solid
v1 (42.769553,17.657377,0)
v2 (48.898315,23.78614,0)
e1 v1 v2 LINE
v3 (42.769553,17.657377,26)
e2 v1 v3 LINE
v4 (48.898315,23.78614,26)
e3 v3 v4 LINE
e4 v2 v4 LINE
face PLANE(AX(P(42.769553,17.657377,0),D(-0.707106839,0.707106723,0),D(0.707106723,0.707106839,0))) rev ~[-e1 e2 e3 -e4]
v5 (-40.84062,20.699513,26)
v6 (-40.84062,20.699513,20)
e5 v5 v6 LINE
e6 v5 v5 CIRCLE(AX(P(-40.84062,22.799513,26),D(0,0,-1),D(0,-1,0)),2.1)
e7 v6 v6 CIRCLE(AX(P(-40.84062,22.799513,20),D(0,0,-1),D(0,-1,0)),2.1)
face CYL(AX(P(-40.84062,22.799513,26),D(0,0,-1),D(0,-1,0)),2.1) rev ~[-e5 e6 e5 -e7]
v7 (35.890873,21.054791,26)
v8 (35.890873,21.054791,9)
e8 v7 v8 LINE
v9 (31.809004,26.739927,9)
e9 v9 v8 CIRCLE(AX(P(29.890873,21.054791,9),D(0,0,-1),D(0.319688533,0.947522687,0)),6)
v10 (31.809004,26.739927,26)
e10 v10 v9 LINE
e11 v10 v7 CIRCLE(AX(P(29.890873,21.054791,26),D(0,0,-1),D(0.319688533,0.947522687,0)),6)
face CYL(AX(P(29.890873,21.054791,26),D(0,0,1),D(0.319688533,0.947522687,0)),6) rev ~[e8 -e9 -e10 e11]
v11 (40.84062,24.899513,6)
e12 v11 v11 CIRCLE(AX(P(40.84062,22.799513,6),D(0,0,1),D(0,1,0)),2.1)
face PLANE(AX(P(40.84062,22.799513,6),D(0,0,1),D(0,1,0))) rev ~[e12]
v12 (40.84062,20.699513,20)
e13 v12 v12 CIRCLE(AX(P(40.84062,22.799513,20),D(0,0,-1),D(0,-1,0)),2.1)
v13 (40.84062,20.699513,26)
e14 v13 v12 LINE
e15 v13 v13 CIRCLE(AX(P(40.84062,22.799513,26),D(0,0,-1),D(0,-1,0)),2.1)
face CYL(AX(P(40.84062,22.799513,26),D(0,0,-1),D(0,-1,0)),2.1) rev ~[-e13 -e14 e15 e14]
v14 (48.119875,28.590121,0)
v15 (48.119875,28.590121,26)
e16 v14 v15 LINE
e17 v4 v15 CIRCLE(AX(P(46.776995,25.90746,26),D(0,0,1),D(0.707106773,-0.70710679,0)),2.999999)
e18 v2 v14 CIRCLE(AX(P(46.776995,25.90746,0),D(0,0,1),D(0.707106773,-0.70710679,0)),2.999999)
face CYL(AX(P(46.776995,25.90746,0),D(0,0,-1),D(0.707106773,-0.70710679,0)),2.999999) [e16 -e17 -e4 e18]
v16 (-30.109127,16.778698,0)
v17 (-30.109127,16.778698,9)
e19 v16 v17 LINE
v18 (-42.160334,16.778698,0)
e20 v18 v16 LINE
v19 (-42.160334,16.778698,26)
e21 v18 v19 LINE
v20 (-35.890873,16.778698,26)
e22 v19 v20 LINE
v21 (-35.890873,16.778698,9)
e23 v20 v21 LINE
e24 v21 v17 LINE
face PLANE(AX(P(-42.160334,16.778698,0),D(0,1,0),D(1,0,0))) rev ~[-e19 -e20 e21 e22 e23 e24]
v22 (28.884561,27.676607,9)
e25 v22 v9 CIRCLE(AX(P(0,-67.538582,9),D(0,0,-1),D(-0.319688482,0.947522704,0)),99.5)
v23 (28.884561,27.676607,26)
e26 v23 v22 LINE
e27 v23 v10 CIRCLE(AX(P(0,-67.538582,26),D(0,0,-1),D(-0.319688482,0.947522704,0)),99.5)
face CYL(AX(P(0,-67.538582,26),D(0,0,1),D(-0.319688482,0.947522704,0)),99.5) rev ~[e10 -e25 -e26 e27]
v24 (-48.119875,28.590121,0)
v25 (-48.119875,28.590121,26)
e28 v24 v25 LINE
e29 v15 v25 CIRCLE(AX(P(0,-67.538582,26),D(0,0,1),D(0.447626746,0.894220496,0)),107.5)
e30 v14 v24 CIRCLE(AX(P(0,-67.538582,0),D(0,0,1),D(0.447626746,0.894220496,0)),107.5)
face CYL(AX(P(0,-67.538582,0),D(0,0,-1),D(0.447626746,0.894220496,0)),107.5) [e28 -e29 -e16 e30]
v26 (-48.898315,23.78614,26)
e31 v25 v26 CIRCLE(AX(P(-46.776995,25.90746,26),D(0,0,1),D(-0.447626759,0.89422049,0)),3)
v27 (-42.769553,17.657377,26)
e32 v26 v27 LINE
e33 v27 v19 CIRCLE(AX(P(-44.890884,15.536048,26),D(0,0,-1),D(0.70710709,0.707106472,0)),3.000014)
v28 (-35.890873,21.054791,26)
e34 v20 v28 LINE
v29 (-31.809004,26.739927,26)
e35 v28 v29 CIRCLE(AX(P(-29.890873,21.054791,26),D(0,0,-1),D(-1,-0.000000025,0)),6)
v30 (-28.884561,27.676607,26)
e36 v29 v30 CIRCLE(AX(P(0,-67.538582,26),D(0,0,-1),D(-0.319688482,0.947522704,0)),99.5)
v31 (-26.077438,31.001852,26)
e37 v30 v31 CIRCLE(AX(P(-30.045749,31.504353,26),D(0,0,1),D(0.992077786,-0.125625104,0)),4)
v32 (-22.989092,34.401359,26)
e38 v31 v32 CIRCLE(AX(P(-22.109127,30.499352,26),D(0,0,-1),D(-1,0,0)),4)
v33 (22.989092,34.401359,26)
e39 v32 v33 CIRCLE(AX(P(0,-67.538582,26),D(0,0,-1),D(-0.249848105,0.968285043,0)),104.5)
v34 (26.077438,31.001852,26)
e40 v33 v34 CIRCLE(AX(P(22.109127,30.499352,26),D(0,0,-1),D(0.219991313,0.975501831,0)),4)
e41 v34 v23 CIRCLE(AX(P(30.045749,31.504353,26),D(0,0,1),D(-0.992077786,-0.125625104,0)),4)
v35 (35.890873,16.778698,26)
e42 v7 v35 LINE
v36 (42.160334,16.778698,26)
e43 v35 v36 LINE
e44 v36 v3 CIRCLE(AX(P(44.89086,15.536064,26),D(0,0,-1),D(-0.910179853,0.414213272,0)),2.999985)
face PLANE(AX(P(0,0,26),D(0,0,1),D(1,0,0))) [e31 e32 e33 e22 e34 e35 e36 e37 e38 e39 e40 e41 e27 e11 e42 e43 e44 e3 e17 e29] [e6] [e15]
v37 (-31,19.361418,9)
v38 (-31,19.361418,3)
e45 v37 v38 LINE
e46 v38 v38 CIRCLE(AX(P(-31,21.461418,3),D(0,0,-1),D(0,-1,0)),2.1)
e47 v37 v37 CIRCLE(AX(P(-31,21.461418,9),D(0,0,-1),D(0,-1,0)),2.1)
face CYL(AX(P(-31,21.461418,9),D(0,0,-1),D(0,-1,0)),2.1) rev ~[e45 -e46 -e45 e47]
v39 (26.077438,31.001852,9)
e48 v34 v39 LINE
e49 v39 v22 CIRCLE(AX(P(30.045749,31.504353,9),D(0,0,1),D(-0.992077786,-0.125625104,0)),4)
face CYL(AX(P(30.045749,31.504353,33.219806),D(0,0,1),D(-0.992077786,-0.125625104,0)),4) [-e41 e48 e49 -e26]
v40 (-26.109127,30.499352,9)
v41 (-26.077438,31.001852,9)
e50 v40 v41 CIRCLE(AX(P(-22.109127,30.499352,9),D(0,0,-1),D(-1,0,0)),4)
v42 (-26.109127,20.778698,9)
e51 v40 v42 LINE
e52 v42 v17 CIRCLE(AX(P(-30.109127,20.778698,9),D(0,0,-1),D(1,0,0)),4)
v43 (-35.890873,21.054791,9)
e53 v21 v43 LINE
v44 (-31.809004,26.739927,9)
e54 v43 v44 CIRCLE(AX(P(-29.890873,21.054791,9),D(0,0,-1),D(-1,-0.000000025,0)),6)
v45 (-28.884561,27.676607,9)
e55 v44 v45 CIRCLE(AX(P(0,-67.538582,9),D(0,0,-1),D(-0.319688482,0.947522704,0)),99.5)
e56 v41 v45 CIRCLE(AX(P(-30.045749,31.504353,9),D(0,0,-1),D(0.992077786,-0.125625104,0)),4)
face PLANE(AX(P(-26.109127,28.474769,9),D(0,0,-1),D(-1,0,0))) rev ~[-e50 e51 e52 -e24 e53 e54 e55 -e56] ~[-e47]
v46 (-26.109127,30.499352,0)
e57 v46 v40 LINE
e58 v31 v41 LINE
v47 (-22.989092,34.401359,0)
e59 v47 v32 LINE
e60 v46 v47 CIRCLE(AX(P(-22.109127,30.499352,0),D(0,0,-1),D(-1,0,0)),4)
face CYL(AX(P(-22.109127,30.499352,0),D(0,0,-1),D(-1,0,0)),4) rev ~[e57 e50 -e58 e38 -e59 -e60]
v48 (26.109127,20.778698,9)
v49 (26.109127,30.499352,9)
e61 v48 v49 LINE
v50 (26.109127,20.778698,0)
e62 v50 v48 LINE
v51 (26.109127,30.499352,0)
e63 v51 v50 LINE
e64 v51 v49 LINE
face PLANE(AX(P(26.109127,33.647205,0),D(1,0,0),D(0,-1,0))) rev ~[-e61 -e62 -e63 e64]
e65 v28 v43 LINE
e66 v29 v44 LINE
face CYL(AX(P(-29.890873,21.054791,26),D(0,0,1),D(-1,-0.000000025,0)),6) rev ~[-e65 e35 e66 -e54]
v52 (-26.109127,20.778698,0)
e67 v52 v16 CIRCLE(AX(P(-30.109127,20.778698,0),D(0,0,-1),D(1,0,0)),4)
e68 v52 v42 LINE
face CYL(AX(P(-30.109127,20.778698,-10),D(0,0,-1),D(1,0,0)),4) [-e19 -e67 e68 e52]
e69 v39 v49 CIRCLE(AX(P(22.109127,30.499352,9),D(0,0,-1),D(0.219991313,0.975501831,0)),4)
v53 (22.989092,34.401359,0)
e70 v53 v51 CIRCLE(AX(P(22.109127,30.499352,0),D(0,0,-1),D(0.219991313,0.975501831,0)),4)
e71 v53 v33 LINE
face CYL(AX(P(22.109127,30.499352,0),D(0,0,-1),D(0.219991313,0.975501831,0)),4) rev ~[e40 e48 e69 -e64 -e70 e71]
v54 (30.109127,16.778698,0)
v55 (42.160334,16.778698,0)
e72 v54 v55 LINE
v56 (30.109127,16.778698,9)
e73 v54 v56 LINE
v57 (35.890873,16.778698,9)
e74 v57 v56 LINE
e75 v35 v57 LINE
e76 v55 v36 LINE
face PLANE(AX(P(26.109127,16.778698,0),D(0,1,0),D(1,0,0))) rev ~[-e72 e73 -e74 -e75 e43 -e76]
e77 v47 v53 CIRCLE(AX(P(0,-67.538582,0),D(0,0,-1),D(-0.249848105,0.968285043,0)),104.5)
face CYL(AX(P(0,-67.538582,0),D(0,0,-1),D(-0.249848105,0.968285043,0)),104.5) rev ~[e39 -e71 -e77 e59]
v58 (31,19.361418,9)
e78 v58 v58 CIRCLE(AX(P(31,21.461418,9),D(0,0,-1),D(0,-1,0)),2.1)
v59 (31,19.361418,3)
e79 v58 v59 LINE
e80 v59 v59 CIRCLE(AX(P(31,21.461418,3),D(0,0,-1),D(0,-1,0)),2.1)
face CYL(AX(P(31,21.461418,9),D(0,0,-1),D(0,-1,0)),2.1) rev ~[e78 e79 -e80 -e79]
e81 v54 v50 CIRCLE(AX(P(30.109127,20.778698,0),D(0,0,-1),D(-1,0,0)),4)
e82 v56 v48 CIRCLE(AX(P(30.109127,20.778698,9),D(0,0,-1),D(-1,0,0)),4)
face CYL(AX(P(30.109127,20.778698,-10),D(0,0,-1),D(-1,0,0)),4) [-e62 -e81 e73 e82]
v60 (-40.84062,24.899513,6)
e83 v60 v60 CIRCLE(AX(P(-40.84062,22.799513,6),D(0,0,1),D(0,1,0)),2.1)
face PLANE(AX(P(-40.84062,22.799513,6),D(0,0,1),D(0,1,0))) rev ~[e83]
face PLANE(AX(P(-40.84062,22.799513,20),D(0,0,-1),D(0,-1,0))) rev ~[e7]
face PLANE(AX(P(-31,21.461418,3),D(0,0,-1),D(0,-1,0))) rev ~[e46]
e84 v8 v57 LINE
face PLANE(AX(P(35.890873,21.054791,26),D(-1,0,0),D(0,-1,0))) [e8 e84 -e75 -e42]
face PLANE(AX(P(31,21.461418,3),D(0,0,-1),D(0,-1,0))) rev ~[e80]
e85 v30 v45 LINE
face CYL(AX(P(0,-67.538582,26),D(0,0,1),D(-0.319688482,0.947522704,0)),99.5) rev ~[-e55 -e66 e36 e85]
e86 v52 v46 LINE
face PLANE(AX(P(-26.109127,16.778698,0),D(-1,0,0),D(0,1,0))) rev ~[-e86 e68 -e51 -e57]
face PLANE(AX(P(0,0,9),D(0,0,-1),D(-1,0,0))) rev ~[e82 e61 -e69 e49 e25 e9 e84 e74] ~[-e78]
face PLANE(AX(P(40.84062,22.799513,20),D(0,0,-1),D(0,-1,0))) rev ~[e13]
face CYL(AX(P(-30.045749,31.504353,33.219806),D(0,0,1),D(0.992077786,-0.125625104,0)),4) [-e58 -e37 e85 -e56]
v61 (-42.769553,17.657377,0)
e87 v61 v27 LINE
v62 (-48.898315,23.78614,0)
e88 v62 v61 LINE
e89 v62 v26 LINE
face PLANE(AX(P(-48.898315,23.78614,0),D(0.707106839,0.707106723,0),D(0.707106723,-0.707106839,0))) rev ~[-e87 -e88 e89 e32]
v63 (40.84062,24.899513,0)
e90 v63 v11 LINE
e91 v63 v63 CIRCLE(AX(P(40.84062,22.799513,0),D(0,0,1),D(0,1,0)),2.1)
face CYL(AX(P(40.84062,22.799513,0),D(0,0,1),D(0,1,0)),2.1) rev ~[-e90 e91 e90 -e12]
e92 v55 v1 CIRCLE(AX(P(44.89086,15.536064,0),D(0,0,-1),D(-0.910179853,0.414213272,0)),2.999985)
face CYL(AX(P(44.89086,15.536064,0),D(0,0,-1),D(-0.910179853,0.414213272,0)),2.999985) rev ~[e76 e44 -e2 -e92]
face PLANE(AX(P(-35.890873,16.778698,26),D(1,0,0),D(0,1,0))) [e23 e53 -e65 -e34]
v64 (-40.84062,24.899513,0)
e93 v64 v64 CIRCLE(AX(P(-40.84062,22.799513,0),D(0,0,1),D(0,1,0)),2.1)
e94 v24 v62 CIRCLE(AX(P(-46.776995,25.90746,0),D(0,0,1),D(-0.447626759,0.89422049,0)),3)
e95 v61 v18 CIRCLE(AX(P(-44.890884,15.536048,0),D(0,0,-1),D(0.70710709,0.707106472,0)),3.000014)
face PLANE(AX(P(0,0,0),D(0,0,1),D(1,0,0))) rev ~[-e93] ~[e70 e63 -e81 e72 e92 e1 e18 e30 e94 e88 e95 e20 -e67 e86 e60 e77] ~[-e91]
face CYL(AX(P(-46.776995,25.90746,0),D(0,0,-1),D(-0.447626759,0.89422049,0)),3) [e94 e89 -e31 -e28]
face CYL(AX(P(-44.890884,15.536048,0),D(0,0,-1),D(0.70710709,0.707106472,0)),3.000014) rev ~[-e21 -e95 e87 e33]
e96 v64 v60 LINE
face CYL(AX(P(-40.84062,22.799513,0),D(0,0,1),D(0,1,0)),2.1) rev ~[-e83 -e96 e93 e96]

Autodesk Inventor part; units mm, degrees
ref_plane "YZ Plane" through (0, 0, 0) normal (1, 0, 0) x (0, 1, 0)
ref_plane "XZ Plane" through (0, 0, 0) normal (0, 1, 0) x (-1, 0, 0)
ref_plane "XY Plane" through (0, 0, 0) normal (0, 0, 1) x (1, 0, 0)
sketch "Sketch1" plane through (0, 0, 0) normal (0, 0, 1) x (1, 0, 0)
  circle A0 centre (40.84062, 22.799513) radius 1.6
  circle A1 centre (-40.84062, 22.799513) radius 1.6
  line L0 (-42.160334, 16.778698) -> (-35.890873, 16.778698)
  line L1 (-35.890873, 16.778698) -> (-35.890873, 21.054791)
  arc A2 (-31.809004, 26.739927) -> (-35.890873, 21.054791) centre (-29.890873, 21.054791) ccw
  arc A3 (31.809004, 26.739927) -> (-31.809004, 26.739927) centre (0, -67.538582) ccw
  arc A4 (35.890873, 21.054791) -> (31.809004, 26.739927) centre (29.890873, 21.054791) ccw
  line L2 (35.890873, 21.054791) -> (35.890873, 16.778698)
  line L3 (35.890873, 16.778698) -> (42.160334, 16.778698)
  arc A5 (42.769553, 17.657377) -> (42.160334, 16.778698) centre (44.890873, 15.536057) ccw
  line L4 (42.769553, 17.657377) -> (48.898315, 23.78614)
  arc A6 (48.898315, 23.78614) -> (48.119875, 28.590121) centre (46.776995, 25.90746) ccw
  arc A7 (48.119875, 28.590121) -> (-48.119875, 28.590121) centre (0, -67.538582) ccw
  arc A8 (-48.119875, 28.590121) -> (-48.898315, 23.78614) centre (-46.776995, 25.90746) ccw
  line L5 (-48.898315, 23.78614) -> (-42.769553, 17.657377)
  arc A9 (-42.160334, 16.778698) -> (-42.769553, 17.657377) centre (-44.890873, 15.536057) ccw
  line L6 (-26.109127, 29.144138) -> (-35.890873, 29.144138) construction
  line L7 (-35.890873, 29.144138) -> (-35.890873, 16.778698) construction
  line L8 (-35.890873, 16.778698) -> (-26.109127, 16.778698)
  line L9 (-26.109127, 16.778698) -> (-26.109127, 29.144138)
  line L10 (-26.109127, 29.144138) -> (-35.890873, 16.778698) construction
  line L11 (-35.890873, 29.144138) -> (-26.109127, 16.778698) construction
  line L12 (-31, 29.144138) -> (-31, 22.961418) construction
  line L13 (-31, 21.461418) -> (-31, 22.961418) construction
  line L14 (-31, 21.461418) -> (-31, 16.778698) construction
  line L15 (0, 31.961418) -> (0, 39.961418) construction
  line L16 (35.890873, 16.778698) -> (35.890873, 21.054791)
  arc A10 (35.890873, 21.054791) -> (31.809004, 26.739927) centre (29.890873, 21.054791) ccw
  line L17 (26.109127, 29.144138) -> (35.890873, 29.144138) construction
  line L18 (35.890873, 29.144138) -> (35.890873, 16.778698) construction
  line L19 (35.890873, 16.778698) -> (26.109127, 16.778698)
  line L20 (26.109127, 16.778698) -> (26.109127, 29.144138)
  line L21 (26.109127, 29.144138) -> (35.890873, 16.778698) construction
  line L22 (35.890873, 29.144138) -> (26.109127, 16.778698) construction
  line L23 (31, 29.144138) -> (31, 22.961418) construction
  line L24 (31, 21.461418) -> (31, 22.961418) construction
  line L25 (31, 21.461418) -> (31, 16.778698) construction
  arc A11 (-32.768069, 29.582495) -> (-38.890873, 21.054791) centre (-29.890873, 21.054791) ccw
  line L26 (-38.890873, 21.054791) -> (-38.890873, 19.778698)
  line L27 (-38.890873, 19.778698) -> (-40.648232, 19.778698)
  arc A12 (-40.648232, 19.778698) -> (-40.648232, 19.778698) centre (-44.890873, 15.536057) ccw
  line L28 (-40.648232, 19.778698) -> (-46.776995, 25.90746)
  arc A13 (-46.776995, 25.90746) -> (-46.776995, 25.90746) centre (-46.776995, 25.90746) ccw
  arc A14 (46.776995, 25.90746) -> (-46.776995, 25.90746) centre (0, -67.538582) ccw
  arc A15 (46.776995, 25.90746) -> (46.776995, 25.90746) centre (46.776995, 25.90746) ccw
  line L29 (46.776995, 25.90746) -> (40.648232, 19.778698)
  arc A16 (40.648232, 19.778698) -> (40.648232, 19.778698) centre (44.890873, 15.536057) ccw
  line L30 (40.648232, 19.778698) -> (38.890873, 19.778698)
  line L31 (38.890873, 19.778698) -> (38.890873, 21.054791)
  arc A17 (38.890873, 21.054791) -> (32.768069, 29.582495) centre (29.890873, 21.054791) ccw
  arc A18 (32.768069, 29.582495) -> (-32.768069, 29.582495) centre (0, -67.538582) ccw
  line L32 (-26.109127, 29.144138) -> (-26.109127, 33.647205)
  line L33 (26.109127, 29.144138) -> (26.109127, 33.647205)
  point P0 (0, 0)
  point P1 (-26.109127, 28.474768)
  point P2 (-31, 22.961418)
  point P3 (31, 22.961418)
  point P4 (26.109127, 28.474768)
  point P5 (-26.109127, 31.580354)
  point P6 (26.109127, 31.580354)
  point P7 (26.109127, 33.647205)
  dimension "d33" = 31
  dimension "d34" = 9
  dimension "d35" = 1.5
  dimension "d50" = 2
sketch "Sketch1 outline for Extrusion1" plane through (0, 0, 0) normal (0, 0, 1) x (1, 0, 0)
  arc A0 (-26.109127, 33.647205) -> (26.109127, 33.647205) centre (0, -67.538582) cw
  line L0 (26.109127, 33.647205) -> (26.109127, 16.778698)
  line L1 (26.109127, 16.778698) -> (42.160334, 16.778698)
  arc A1 (42.160334, 16.778698) -> (42.769553, 17.657377) centre (44.890873, 15.536057) cw
  line L2 (42.769553, 17.657377) -> (48.898315, 23.78614)
  arc A2 (48.898315, 23.78614) -> (48.119875, 28.590121) centre (46.776995, 25.90746) ccw
  arc A3 (48.119875, 28.590121) -> (-48.119875, 28.590121) centre (0, -67.538582) ccw
  arc A4 (-48.119875, 28.590121) -> (-48.898315, 23.78614) centre (-46.776995, 25.90746) ccw
  line L3 (-48.898315, 23.78614) -> (-42.769553, 17.657377)
  arc A5 (-42.769553, 17.657377) -> (-42.160334, 16.778698) centre (-44.890873, 15.536057) cw
  line L4 (-42.160334, 16.778698) -> (-26.109127, 16.778698)
  line L5 (-26.109127, 16.778698) -> (-26.109127, 33.647205)
extrude "Extrusion1" add sketch "Sketch1 outline for Extrusion1" along normal blind 26
sketch "Sketch2" plane through (0, 0, 26) normal (0, 0, 1) x (1, 0, 0)
  point P0 (0, 0)
  point P1 (-40.84062, 22.799513)
  point P2 (40.84062, 22.799513)
hole "Hole1" at (-40.84062, 22.799513, 26) at (40.84062, 22.799513, 26) direction (0, 0, -1) diameter 4.2 depth 6
sketch "Sketch3" plane through (0, 0, 0) normal (0, 0, -1) x (-1, 0, 0)
  point P0 (0, 0)
  point P1 (40.84062, 22.799513)
  point P2 (-40.84062, 22.799513)
hole "Hole2" at (-40.84062, 22.799513, 0) at (40.84062, 22.799513, 0) direction (0, 0, 1) diameter 4.2 depth 6
sketch "Sketch4" plane through (0, 0, 26) normal (0, 0, -1) x (-1, 0, 0)
  arc A0 (35.890873, 21.054791) -> (31.809004, 26.739927) centre (29.890873, 21.054791) ccw
  arc A1 (31.809004, 26.739927) -> (-31.809004, 26.739927) centre (0, -67.538582) ccw
  line L0 (35.890873, 29.144138) -> (35.890873, 16.778698) construction
  line L1 (35.890873, 16.778698) -> (35.890873, 21.054791)
  line L2 (35.890873, 16.778698) -> (26.109127, 16.778698)
  line L3 (26.109127, 16.778698) -> (26.109127, 29.144138)
  line L4 (-26.109127, 28.474768) -> (-26.109127, 16.778698)
  line L5 (-35.890873, 16.778698) -> (-26.109127, 16.778698)
  line L6 (-35.890873, 21.054791) -> (-35.890873, 16.778698)
  arc A2 (-31.809004, 26.739927) -> (-35.890873, 21.054791) centre (-29.890873, 21.054791) ccw
  point P0 (0, 0)
  point P1 (26.109127, 28.474768)
extrude "Extrusion2" cut sketch "Sketch4" along normal blind 17 from surface at 0
fillet "Fillet1" radius 4 6 edges at (-26.1091, 16.7787, 4.5) (26.1091, 16.7787, 4.5) (-26.1091, 33.6472, 13) (26.1091, 33.6472, 13) (-26.1091, 28.4748, 17.5) (26.1091, 28.4748, 17.5)
sketch "Sketch5" plane through (-35.890873, 16.778698, 9) normal (0, 0, 1) x (1, 0, 0)
  point P0 (35.890873, -16.778698)
  point P1 (4.890873, 4.68272)
  point P2 (66.890873, 4.68272)
hole "Hole3" at (-31, 21.461418, 9) at (31, 21.461418, 9) direction (0, 0, -1) diameter 4.2 depth 6
properties part number "Side Wall"
